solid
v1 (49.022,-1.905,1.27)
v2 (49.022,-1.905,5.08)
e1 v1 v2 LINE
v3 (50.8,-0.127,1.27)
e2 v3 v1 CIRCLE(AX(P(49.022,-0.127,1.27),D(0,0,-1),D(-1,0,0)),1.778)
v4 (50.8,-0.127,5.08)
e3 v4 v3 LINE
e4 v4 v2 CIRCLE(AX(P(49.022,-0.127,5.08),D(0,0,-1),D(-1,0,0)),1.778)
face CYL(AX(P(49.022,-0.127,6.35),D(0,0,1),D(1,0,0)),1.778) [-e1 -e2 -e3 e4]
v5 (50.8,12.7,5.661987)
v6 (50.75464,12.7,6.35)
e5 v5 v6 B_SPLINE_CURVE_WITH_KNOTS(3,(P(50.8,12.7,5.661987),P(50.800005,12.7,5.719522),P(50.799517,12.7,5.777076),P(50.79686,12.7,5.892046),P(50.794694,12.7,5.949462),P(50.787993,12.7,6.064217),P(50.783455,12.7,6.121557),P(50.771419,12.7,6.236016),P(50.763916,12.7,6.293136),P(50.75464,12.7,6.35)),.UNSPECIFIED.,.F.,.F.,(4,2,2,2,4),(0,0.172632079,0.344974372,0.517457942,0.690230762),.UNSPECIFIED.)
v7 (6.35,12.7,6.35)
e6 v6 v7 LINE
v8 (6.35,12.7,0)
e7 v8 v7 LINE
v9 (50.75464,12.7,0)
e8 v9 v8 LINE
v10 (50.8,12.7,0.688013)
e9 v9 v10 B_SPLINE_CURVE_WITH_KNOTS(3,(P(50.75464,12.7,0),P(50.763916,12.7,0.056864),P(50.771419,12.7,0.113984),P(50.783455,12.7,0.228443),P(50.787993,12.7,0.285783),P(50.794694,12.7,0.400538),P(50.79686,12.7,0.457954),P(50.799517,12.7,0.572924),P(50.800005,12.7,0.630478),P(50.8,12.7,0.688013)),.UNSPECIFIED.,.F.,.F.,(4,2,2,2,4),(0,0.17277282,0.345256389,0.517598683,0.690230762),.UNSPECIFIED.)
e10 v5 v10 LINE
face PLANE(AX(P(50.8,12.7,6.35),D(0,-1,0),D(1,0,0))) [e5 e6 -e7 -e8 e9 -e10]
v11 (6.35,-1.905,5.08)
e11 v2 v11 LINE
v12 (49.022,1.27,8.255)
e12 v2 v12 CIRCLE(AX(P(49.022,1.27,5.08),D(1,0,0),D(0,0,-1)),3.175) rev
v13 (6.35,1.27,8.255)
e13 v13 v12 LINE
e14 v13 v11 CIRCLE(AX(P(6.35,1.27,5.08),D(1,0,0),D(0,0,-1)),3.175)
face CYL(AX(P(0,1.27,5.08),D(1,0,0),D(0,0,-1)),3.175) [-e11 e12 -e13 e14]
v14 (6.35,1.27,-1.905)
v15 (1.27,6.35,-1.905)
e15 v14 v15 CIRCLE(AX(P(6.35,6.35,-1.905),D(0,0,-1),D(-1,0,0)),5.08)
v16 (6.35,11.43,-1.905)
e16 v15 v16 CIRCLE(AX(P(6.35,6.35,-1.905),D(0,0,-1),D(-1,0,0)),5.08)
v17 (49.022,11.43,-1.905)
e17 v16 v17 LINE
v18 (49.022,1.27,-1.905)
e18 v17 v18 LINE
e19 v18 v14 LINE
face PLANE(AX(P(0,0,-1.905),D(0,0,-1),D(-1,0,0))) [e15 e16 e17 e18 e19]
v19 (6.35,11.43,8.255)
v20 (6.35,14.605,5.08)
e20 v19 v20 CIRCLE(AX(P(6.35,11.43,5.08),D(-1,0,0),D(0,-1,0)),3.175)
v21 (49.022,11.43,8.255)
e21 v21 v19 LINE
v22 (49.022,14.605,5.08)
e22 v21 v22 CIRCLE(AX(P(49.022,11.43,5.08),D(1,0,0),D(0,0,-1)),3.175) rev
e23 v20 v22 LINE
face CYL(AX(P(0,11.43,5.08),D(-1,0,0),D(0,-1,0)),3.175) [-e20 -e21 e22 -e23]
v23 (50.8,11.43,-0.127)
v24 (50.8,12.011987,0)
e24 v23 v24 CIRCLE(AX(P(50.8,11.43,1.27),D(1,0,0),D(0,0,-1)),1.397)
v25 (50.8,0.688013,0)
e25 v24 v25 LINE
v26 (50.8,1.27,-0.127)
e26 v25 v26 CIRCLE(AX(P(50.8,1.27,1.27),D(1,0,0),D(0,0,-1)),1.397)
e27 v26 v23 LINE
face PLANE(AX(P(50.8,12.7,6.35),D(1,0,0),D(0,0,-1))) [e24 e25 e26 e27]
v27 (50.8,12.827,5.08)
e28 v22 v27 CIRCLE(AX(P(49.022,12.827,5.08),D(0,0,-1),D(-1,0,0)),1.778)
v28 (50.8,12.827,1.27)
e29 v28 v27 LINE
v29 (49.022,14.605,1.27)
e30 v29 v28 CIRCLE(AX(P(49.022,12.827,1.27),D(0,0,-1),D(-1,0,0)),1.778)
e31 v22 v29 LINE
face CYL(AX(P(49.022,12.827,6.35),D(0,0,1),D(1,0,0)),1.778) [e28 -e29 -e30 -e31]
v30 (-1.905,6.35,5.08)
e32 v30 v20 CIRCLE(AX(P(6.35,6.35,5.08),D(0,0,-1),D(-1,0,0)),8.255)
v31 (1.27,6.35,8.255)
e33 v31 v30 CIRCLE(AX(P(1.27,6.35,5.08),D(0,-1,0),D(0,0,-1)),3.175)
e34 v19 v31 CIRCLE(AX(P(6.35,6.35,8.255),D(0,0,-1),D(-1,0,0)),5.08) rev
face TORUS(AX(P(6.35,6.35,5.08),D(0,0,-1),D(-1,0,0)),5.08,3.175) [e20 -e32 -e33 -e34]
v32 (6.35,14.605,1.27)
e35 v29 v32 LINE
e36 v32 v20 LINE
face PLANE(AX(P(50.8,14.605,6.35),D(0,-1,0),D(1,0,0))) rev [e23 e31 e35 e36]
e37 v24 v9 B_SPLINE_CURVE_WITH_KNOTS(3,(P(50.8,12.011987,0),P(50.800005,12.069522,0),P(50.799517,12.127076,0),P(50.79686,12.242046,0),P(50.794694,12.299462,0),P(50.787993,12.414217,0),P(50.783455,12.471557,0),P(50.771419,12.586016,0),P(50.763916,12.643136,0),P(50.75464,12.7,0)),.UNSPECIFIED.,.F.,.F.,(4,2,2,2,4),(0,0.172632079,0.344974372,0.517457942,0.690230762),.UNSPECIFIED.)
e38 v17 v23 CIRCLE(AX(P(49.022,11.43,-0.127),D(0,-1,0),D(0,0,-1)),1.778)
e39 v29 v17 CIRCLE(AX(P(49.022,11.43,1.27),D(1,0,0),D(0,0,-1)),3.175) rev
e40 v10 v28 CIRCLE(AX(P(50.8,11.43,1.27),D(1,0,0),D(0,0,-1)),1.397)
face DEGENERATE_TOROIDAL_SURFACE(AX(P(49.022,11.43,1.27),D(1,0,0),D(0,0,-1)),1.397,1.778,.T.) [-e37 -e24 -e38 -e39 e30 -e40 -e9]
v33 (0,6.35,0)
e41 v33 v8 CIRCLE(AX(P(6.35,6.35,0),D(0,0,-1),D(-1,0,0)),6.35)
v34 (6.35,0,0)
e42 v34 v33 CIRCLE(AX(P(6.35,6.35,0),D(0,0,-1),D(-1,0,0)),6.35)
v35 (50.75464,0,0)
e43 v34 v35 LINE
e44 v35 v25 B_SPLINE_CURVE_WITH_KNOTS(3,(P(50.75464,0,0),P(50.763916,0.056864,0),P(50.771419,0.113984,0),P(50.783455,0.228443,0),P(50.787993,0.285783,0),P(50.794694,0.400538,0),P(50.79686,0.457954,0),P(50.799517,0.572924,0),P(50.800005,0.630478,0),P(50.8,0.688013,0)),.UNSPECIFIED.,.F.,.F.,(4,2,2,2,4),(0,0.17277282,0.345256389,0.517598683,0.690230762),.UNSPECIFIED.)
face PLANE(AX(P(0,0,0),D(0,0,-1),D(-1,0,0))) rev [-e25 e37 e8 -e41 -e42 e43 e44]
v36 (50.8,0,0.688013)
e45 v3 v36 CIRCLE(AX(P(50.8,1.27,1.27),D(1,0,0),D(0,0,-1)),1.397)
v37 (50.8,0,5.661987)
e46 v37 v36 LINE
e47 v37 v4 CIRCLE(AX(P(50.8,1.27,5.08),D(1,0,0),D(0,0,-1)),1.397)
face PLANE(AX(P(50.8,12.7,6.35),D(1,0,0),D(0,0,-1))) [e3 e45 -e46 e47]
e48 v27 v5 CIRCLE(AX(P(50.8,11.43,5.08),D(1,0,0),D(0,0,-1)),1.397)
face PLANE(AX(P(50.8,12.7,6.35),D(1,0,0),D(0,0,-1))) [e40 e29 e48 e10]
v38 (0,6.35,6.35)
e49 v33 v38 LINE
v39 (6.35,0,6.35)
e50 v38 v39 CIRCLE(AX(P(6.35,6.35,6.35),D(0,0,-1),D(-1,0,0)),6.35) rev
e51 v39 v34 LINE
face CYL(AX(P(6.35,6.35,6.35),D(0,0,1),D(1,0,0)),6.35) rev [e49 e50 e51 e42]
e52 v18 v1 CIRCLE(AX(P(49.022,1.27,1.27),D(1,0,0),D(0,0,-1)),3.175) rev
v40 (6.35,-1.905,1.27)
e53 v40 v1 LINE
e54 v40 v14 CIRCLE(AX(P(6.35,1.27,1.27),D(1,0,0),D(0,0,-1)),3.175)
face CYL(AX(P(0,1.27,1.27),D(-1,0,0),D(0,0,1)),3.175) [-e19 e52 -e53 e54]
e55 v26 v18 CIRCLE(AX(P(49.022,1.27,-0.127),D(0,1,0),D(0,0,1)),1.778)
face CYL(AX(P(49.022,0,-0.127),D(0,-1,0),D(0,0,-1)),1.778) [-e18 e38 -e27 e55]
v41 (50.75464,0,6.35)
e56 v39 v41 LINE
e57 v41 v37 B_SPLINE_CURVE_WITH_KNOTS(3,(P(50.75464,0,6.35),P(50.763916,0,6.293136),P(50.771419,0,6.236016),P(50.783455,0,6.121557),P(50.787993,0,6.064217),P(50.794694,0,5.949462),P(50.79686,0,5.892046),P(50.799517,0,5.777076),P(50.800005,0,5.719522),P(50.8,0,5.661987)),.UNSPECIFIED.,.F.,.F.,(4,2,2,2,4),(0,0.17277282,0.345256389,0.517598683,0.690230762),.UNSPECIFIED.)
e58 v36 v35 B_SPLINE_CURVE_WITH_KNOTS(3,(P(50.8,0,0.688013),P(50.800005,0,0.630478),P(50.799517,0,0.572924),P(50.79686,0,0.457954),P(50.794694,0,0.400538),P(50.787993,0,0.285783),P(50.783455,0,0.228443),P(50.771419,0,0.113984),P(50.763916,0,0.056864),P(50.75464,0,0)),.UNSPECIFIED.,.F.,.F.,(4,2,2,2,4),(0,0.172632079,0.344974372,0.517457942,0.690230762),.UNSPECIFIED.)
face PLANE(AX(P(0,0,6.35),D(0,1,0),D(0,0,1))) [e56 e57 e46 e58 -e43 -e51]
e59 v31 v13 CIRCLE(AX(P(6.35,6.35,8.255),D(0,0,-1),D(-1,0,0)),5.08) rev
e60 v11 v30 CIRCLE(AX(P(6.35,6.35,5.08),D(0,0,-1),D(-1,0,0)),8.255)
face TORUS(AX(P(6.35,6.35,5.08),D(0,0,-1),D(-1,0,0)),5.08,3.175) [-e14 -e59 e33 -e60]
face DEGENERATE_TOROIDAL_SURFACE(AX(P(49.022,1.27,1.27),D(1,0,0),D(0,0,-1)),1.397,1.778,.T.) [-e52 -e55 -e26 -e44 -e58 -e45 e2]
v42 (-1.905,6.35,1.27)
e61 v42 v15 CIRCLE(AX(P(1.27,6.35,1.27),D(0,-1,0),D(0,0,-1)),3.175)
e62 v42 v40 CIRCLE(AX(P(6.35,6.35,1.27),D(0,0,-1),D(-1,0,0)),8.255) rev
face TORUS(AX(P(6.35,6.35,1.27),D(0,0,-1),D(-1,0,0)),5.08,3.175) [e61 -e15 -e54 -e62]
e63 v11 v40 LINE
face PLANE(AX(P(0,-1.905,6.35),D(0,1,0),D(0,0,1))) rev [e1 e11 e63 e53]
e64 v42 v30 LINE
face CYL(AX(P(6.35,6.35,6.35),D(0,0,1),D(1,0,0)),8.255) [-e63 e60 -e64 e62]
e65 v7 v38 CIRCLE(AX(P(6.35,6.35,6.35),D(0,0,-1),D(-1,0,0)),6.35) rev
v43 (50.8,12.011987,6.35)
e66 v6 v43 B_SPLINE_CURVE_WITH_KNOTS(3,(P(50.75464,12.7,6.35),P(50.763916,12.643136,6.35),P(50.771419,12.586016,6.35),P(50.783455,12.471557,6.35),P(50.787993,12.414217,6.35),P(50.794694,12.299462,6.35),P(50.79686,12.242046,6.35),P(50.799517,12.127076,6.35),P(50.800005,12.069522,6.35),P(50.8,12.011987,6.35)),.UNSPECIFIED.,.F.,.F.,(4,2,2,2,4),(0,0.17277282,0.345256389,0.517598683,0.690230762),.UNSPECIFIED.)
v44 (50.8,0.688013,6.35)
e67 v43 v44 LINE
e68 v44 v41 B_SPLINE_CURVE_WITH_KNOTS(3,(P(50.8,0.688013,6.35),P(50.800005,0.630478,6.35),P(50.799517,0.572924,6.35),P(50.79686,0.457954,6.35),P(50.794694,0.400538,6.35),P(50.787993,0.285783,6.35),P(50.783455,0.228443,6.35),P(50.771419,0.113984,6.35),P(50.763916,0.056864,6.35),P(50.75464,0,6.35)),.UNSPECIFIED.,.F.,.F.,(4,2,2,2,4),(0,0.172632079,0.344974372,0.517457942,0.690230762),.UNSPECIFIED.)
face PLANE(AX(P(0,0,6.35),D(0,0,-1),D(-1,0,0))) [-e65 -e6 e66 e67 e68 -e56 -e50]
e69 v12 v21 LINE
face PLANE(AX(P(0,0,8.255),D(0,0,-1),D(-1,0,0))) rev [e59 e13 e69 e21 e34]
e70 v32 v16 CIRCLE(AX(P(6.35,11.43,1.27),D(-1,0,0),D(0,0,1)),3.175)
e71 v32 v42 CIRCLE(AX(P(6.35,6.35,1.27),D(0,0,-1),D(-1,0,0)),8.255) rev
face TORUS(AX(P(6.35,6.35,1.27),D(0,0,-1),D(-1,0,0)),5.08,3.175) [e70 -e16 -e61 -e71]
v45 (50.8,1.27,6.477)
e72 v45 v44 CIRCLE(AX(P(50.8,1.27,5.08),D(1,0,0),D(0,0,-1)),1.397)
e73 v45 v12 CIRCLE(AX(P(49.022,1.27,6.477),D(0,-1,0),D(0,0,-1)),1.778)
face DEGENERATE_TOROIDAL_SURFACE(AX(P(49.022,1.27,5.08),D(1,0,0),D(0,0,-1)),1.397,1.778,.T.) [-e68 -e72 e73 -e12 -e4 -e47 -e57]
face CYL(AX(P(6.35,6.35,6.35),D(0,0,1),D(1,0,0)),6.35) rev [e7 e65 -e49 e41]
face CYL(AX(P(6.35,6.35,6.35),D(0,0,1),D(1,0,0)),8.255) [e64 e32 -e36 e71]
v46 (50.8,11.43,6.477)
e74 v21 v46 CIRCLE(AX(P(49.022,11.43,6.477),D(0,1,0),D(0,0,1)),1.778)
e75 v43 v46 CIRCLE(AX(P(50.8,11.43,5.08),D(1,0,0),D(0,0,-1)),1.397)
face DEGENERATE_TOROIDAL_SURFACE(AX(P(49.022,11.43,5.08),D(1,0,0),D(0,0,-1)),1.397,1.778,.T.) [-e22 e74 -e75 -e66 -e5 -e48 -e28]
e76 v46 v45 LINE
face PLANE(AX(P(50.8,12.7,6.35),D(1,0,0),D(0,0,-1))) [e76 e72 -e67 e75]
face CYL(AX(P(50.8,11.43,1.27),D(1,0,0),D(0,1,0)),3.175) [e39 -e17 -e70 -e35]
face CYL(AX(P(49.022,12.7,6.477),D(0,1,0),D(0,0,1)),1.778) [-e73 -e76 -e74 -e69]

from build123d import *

# Parameters (mm, degrees)
SKETCH1_W          = 50.8
SKETCH1_H          = 12.7
BASE_EXTRUDE_DEPTH = 6.35
FILLET1_R          = 6.35
SHELL1_DEPTH       = 6.35
SHELL1_START       = -1.905
SHELL1_2_DEPTH     = 10.16
SHELL1_3_DEPTH     = 1.905
SHELL1_START_2     = 6.35
SHELL1_4_DEPTH     = 1.905
FILLET3_R          = 3.175
FILLET4_R          = 1.778


# Read off the part's stored shape, not the designer's step: Shell1
# Some blends are built 0.0001 mm under size
with BuildPart() as part:
    # Sketch1 → Base-Extrude (new body)
    with BuildSketch(Plane.XY):
        with Locations((25.4, 6.35)):
            Rectangle(SKETCH1_W, SKETCH1_H)
    extrude(amount=BASE_EXTRUDE_DEPTH)

    # Fillet1
    fillet1_edges = [part.edges().sort_by_distance(p)[0] for p in [
        (0, 0, 3.175),
        (0, 12.7, 3.175),
    ]]
    fillet(fillet1_edges, radius=FILLET1_R - 0.0001)  # a hair under: the kernel refuses the full size

    # Shell1 outline → Shell1 (cut)
    with BuildSketch(Plane.XY):
        with BuildLine():
            Line((6.35, 0), (50.8, 0))
            Line((50.8, 0), (50.8, 12.7))
            Line((50.8, 12.7), (6.35, 12.7))
            ThreePointArc((6.35, 12.7), (1.859871939, 10.840128061), (0, 6.35))
            ThreePointArc((0, 6.35), (1.859871939, 1.859871939), (6.35, 0))
        make_face()
    extrude(amount=SHELL1_DEPTH, mode=Mode.SUBTRACT)

    # Shell1 2 outline → Shell1 2 (add)
    with BuildSketch(Plane.XY.offset(SHELL1_START)):
        with BuildLine():
            Line((6.35, -1.905), (50.8, -1.905))
            Line((50.8, -1.905), (50.8, 0))
            Line((50.8, 0), (6.35, 0))
            ThreePointArc((6.35, 0), (1.859871939, 1.859871939), (0, 6.35))
            ThreePointArc((0, 6.35), (1.859871939, 10.840128061), (6.35, 12.7))
            Line((6.35, 12.7), (50.8, 12.7))
            Line((50.8, 12.7), (50.8, 14.605))
            Line((50.8, 14.605), (6.35, 14.605))
            ThreePointArc((6.35, 14.605), (0.512833521, 12.187166479), (-1.905, 6.35))
            ThreePointArc((-1.905, 6.35), (0.512833521, 0.512833521), (6.35, -1.905))
        make_face()
    extrude(amount=SHELL1_2_DEPTH)

    # Shell1 3 outline → Shell1 3 (add)
    with BuildSketch(Plane.XY.offset(SHELL1_START)):
        with BuildLine():
            Line((6.35, 0), (50.8, 0))
            Line((50.8, 0), (50.8, 12.7))
            Line((50.8, 12.7), (6.35, 12.7))
            ThreePointArc((6.35, 12.7), (1.859871939, 10.840128061), (0, 6.35))
            ThreePointArc((0, 6.35), (1.859871939, 1.859871939), (6.35, 0))
        make_face()
    extrude(amount=SHELL1_3_DEPTH)

    # Shell1 4 outline → Shell1 4 (add)
    with BuildSketch(Plane.XY.offset(SHELL1_START_2)):
        with BuildLine():
            Line((6.35, 0), (50.8, 0))
            Line((50.8, 0), (50.8, 12.7))
            Line((50.8, 12.7), (6.35, 12.7))
            ThreePointArc((6.35, 12.7), (1.859871939, 10.840128061), (0, 6.35))
            ThreePointArc((0, 6.35), (1.859871939, 1.859871939), (6.35, 0))
        make_face()
    extrude(amount=SHELL1_4_DEPTH)

    # Fillet3
    fillet3_edges = [part.edges().sort_by_distance(p)[0] for p in [
        (28.575, -1.905, -1.905),
        (0.512833521, 0.512833521, -1.905),
        (0.512833521, 12.187166479, -1.905),
        (28.575, -1.905, 8.255),
        (0.512833521, 0.512833521, 8.255),
        (0.512833521, 12.187166479, 8.255),
        (28.575, 14.605, -1.905),
        (28.575, 14.605, 8.255),
    ]]
    fillet(fillet3_edges, radius=FILLET3_R)

    # Fillet4
    # the kernel refuses this fillet: 1.778 mm, written as the material it takes off along each edge
    with BuildSketch(Plane(origin=(50.8, -1.905, 1.27), x_dir=(0, 1, 0), z_dir=(0, 0, 1))) as fillet4_piece_1:
        with BuildLine():
            CenterArc((FILLET4_R, FILLET4_R), FILLET4_R, 180, 90)
            Line((0, FILLET4_R), (0, 0))
            Line((0, 0), (FILLET4_R, 0))
        make_face()
    extrude(amount=3.81, mode=Mode.SUBTRACT)
    with BuildSketch(Plane(origin=(50.8, 1.27, -1.905), x_dir=(0, 0, 1), z_dir=(0, 1, 0)), Plane(origin=(50.8, 11.43, 8.255), x_dir=(0, 0, -1), z_dir=(0, -1, 0))) as fillet4_piece_2:
        with BuildLine():
            CenterArc((FILLET4_R, -FILLET4_R), FILLET4_R, 90, 90)
            Line((0, -FILLET4_R), (0, 0))
            Line((0, 0), (FILLET4_R, 0))
        make_face()
    extrude(amount=10.16, mode=Mode.SUBTRACT)
    with BuildSketch(Plane(origin=(50.8, 14.605, 1.27), x_dir=(0, -1, 0), z_dir=(0, 0, 1))) as fillet4_piece_3:
        with BuildLine():
            CenterArc((FILLET4_R, -FILLET4_R), FILLET4_R, 90, 90)
            Line((0, -FILLET4_R), (0, 0))
            Line((0, 0), (FILLET4_R, 0))
        make_face()
    extrude(amount=3.81, mode=Mode.SUBTRACT)
    with BuildSketch(Plane(origin=(50.8, 11.43, 5.08), x_dir=(0, 1, 0), z_dir=(0, 0, -1))) as fillet4_piece_4:
        with BuildLine():
            CenterArc((3.175 - FILLET4_R, -FILLET4_R), FILLET4_R, 0, 90)
            Line((3.175, -FILLET4_R), (3.175, 0))
            Line((3.175, 0), (3.175 - FILLET4_R, 0))
        make_face()
    revolve(axis=Axis((50.8, 11.43, 5.08), (1, 0, 0)), revolution_arc=90, mode=Mode.SUBTRACT)
    with BuildSketch(Plane(origin=(50.8, 11.43, 1.27), x_dir=(0, 1, 0), z_dir=(0, 0, 1))) as fillet4_piece_5:
        with BuildLine():
            CenterArc((3.175 - FILLET4_R, FILLET4_R), FILLET4_R, 270, 90)
            Line((3.175, FILLET4_R), (3.175, 0))
            Line((3.175, 0), (3.175 - FILLET4_R, 0))
        make_face()
    revolve(axis=Axis((50.8, 11.43, 1.27), (-1, 0, 0)), revolution_arc=90, mode=Mode.SUBTRACT)
    with BuildSketch(Plane(origin=(50.8, 1.27, 5.08), x_dir=(0, -1, 0), z_dir=(0, 0, -1))) as fillet4_piece_6:
        with BuildLine():
            CenterArc((3.175 - FILLET4_R, FILLET4_R), FILLET4_R, 270, 90)
            Line((3.175, FILLET4_R), (3.175, 0))
            Line((3.175, 0), (3.175 - FILLET4_R, 0))
        make_face()
    revolve(axis=Axis((50.8, 1.27, 5.08), (-1, 0, 0)), revolution_arc=90, mode=Mode.SUBTRACT)
    with BuildSketch(Plane(origin=(50.8, 1.27, 1.27), x_dir=(0, -1, 0), z_dir=(0, 0, 1))) as fillet4_piece_7:
        with BuildLine():
            CenterArc((3.175 - FILLET4_R, -FILLET4_R), FILLET4_R, 0, 90)
            Line((3.175, -FILLET4_R), (3.175, 0))
            Line((3.175, 0), (3.175 - FILLET4_R, 0))
        make_face()
    revolve(axis=Axis((50.8, 1.27, 1.27), (1, 0, 0)), revolution_arc=90, mode=Mode.SUBTRACT)


solid = part.part
